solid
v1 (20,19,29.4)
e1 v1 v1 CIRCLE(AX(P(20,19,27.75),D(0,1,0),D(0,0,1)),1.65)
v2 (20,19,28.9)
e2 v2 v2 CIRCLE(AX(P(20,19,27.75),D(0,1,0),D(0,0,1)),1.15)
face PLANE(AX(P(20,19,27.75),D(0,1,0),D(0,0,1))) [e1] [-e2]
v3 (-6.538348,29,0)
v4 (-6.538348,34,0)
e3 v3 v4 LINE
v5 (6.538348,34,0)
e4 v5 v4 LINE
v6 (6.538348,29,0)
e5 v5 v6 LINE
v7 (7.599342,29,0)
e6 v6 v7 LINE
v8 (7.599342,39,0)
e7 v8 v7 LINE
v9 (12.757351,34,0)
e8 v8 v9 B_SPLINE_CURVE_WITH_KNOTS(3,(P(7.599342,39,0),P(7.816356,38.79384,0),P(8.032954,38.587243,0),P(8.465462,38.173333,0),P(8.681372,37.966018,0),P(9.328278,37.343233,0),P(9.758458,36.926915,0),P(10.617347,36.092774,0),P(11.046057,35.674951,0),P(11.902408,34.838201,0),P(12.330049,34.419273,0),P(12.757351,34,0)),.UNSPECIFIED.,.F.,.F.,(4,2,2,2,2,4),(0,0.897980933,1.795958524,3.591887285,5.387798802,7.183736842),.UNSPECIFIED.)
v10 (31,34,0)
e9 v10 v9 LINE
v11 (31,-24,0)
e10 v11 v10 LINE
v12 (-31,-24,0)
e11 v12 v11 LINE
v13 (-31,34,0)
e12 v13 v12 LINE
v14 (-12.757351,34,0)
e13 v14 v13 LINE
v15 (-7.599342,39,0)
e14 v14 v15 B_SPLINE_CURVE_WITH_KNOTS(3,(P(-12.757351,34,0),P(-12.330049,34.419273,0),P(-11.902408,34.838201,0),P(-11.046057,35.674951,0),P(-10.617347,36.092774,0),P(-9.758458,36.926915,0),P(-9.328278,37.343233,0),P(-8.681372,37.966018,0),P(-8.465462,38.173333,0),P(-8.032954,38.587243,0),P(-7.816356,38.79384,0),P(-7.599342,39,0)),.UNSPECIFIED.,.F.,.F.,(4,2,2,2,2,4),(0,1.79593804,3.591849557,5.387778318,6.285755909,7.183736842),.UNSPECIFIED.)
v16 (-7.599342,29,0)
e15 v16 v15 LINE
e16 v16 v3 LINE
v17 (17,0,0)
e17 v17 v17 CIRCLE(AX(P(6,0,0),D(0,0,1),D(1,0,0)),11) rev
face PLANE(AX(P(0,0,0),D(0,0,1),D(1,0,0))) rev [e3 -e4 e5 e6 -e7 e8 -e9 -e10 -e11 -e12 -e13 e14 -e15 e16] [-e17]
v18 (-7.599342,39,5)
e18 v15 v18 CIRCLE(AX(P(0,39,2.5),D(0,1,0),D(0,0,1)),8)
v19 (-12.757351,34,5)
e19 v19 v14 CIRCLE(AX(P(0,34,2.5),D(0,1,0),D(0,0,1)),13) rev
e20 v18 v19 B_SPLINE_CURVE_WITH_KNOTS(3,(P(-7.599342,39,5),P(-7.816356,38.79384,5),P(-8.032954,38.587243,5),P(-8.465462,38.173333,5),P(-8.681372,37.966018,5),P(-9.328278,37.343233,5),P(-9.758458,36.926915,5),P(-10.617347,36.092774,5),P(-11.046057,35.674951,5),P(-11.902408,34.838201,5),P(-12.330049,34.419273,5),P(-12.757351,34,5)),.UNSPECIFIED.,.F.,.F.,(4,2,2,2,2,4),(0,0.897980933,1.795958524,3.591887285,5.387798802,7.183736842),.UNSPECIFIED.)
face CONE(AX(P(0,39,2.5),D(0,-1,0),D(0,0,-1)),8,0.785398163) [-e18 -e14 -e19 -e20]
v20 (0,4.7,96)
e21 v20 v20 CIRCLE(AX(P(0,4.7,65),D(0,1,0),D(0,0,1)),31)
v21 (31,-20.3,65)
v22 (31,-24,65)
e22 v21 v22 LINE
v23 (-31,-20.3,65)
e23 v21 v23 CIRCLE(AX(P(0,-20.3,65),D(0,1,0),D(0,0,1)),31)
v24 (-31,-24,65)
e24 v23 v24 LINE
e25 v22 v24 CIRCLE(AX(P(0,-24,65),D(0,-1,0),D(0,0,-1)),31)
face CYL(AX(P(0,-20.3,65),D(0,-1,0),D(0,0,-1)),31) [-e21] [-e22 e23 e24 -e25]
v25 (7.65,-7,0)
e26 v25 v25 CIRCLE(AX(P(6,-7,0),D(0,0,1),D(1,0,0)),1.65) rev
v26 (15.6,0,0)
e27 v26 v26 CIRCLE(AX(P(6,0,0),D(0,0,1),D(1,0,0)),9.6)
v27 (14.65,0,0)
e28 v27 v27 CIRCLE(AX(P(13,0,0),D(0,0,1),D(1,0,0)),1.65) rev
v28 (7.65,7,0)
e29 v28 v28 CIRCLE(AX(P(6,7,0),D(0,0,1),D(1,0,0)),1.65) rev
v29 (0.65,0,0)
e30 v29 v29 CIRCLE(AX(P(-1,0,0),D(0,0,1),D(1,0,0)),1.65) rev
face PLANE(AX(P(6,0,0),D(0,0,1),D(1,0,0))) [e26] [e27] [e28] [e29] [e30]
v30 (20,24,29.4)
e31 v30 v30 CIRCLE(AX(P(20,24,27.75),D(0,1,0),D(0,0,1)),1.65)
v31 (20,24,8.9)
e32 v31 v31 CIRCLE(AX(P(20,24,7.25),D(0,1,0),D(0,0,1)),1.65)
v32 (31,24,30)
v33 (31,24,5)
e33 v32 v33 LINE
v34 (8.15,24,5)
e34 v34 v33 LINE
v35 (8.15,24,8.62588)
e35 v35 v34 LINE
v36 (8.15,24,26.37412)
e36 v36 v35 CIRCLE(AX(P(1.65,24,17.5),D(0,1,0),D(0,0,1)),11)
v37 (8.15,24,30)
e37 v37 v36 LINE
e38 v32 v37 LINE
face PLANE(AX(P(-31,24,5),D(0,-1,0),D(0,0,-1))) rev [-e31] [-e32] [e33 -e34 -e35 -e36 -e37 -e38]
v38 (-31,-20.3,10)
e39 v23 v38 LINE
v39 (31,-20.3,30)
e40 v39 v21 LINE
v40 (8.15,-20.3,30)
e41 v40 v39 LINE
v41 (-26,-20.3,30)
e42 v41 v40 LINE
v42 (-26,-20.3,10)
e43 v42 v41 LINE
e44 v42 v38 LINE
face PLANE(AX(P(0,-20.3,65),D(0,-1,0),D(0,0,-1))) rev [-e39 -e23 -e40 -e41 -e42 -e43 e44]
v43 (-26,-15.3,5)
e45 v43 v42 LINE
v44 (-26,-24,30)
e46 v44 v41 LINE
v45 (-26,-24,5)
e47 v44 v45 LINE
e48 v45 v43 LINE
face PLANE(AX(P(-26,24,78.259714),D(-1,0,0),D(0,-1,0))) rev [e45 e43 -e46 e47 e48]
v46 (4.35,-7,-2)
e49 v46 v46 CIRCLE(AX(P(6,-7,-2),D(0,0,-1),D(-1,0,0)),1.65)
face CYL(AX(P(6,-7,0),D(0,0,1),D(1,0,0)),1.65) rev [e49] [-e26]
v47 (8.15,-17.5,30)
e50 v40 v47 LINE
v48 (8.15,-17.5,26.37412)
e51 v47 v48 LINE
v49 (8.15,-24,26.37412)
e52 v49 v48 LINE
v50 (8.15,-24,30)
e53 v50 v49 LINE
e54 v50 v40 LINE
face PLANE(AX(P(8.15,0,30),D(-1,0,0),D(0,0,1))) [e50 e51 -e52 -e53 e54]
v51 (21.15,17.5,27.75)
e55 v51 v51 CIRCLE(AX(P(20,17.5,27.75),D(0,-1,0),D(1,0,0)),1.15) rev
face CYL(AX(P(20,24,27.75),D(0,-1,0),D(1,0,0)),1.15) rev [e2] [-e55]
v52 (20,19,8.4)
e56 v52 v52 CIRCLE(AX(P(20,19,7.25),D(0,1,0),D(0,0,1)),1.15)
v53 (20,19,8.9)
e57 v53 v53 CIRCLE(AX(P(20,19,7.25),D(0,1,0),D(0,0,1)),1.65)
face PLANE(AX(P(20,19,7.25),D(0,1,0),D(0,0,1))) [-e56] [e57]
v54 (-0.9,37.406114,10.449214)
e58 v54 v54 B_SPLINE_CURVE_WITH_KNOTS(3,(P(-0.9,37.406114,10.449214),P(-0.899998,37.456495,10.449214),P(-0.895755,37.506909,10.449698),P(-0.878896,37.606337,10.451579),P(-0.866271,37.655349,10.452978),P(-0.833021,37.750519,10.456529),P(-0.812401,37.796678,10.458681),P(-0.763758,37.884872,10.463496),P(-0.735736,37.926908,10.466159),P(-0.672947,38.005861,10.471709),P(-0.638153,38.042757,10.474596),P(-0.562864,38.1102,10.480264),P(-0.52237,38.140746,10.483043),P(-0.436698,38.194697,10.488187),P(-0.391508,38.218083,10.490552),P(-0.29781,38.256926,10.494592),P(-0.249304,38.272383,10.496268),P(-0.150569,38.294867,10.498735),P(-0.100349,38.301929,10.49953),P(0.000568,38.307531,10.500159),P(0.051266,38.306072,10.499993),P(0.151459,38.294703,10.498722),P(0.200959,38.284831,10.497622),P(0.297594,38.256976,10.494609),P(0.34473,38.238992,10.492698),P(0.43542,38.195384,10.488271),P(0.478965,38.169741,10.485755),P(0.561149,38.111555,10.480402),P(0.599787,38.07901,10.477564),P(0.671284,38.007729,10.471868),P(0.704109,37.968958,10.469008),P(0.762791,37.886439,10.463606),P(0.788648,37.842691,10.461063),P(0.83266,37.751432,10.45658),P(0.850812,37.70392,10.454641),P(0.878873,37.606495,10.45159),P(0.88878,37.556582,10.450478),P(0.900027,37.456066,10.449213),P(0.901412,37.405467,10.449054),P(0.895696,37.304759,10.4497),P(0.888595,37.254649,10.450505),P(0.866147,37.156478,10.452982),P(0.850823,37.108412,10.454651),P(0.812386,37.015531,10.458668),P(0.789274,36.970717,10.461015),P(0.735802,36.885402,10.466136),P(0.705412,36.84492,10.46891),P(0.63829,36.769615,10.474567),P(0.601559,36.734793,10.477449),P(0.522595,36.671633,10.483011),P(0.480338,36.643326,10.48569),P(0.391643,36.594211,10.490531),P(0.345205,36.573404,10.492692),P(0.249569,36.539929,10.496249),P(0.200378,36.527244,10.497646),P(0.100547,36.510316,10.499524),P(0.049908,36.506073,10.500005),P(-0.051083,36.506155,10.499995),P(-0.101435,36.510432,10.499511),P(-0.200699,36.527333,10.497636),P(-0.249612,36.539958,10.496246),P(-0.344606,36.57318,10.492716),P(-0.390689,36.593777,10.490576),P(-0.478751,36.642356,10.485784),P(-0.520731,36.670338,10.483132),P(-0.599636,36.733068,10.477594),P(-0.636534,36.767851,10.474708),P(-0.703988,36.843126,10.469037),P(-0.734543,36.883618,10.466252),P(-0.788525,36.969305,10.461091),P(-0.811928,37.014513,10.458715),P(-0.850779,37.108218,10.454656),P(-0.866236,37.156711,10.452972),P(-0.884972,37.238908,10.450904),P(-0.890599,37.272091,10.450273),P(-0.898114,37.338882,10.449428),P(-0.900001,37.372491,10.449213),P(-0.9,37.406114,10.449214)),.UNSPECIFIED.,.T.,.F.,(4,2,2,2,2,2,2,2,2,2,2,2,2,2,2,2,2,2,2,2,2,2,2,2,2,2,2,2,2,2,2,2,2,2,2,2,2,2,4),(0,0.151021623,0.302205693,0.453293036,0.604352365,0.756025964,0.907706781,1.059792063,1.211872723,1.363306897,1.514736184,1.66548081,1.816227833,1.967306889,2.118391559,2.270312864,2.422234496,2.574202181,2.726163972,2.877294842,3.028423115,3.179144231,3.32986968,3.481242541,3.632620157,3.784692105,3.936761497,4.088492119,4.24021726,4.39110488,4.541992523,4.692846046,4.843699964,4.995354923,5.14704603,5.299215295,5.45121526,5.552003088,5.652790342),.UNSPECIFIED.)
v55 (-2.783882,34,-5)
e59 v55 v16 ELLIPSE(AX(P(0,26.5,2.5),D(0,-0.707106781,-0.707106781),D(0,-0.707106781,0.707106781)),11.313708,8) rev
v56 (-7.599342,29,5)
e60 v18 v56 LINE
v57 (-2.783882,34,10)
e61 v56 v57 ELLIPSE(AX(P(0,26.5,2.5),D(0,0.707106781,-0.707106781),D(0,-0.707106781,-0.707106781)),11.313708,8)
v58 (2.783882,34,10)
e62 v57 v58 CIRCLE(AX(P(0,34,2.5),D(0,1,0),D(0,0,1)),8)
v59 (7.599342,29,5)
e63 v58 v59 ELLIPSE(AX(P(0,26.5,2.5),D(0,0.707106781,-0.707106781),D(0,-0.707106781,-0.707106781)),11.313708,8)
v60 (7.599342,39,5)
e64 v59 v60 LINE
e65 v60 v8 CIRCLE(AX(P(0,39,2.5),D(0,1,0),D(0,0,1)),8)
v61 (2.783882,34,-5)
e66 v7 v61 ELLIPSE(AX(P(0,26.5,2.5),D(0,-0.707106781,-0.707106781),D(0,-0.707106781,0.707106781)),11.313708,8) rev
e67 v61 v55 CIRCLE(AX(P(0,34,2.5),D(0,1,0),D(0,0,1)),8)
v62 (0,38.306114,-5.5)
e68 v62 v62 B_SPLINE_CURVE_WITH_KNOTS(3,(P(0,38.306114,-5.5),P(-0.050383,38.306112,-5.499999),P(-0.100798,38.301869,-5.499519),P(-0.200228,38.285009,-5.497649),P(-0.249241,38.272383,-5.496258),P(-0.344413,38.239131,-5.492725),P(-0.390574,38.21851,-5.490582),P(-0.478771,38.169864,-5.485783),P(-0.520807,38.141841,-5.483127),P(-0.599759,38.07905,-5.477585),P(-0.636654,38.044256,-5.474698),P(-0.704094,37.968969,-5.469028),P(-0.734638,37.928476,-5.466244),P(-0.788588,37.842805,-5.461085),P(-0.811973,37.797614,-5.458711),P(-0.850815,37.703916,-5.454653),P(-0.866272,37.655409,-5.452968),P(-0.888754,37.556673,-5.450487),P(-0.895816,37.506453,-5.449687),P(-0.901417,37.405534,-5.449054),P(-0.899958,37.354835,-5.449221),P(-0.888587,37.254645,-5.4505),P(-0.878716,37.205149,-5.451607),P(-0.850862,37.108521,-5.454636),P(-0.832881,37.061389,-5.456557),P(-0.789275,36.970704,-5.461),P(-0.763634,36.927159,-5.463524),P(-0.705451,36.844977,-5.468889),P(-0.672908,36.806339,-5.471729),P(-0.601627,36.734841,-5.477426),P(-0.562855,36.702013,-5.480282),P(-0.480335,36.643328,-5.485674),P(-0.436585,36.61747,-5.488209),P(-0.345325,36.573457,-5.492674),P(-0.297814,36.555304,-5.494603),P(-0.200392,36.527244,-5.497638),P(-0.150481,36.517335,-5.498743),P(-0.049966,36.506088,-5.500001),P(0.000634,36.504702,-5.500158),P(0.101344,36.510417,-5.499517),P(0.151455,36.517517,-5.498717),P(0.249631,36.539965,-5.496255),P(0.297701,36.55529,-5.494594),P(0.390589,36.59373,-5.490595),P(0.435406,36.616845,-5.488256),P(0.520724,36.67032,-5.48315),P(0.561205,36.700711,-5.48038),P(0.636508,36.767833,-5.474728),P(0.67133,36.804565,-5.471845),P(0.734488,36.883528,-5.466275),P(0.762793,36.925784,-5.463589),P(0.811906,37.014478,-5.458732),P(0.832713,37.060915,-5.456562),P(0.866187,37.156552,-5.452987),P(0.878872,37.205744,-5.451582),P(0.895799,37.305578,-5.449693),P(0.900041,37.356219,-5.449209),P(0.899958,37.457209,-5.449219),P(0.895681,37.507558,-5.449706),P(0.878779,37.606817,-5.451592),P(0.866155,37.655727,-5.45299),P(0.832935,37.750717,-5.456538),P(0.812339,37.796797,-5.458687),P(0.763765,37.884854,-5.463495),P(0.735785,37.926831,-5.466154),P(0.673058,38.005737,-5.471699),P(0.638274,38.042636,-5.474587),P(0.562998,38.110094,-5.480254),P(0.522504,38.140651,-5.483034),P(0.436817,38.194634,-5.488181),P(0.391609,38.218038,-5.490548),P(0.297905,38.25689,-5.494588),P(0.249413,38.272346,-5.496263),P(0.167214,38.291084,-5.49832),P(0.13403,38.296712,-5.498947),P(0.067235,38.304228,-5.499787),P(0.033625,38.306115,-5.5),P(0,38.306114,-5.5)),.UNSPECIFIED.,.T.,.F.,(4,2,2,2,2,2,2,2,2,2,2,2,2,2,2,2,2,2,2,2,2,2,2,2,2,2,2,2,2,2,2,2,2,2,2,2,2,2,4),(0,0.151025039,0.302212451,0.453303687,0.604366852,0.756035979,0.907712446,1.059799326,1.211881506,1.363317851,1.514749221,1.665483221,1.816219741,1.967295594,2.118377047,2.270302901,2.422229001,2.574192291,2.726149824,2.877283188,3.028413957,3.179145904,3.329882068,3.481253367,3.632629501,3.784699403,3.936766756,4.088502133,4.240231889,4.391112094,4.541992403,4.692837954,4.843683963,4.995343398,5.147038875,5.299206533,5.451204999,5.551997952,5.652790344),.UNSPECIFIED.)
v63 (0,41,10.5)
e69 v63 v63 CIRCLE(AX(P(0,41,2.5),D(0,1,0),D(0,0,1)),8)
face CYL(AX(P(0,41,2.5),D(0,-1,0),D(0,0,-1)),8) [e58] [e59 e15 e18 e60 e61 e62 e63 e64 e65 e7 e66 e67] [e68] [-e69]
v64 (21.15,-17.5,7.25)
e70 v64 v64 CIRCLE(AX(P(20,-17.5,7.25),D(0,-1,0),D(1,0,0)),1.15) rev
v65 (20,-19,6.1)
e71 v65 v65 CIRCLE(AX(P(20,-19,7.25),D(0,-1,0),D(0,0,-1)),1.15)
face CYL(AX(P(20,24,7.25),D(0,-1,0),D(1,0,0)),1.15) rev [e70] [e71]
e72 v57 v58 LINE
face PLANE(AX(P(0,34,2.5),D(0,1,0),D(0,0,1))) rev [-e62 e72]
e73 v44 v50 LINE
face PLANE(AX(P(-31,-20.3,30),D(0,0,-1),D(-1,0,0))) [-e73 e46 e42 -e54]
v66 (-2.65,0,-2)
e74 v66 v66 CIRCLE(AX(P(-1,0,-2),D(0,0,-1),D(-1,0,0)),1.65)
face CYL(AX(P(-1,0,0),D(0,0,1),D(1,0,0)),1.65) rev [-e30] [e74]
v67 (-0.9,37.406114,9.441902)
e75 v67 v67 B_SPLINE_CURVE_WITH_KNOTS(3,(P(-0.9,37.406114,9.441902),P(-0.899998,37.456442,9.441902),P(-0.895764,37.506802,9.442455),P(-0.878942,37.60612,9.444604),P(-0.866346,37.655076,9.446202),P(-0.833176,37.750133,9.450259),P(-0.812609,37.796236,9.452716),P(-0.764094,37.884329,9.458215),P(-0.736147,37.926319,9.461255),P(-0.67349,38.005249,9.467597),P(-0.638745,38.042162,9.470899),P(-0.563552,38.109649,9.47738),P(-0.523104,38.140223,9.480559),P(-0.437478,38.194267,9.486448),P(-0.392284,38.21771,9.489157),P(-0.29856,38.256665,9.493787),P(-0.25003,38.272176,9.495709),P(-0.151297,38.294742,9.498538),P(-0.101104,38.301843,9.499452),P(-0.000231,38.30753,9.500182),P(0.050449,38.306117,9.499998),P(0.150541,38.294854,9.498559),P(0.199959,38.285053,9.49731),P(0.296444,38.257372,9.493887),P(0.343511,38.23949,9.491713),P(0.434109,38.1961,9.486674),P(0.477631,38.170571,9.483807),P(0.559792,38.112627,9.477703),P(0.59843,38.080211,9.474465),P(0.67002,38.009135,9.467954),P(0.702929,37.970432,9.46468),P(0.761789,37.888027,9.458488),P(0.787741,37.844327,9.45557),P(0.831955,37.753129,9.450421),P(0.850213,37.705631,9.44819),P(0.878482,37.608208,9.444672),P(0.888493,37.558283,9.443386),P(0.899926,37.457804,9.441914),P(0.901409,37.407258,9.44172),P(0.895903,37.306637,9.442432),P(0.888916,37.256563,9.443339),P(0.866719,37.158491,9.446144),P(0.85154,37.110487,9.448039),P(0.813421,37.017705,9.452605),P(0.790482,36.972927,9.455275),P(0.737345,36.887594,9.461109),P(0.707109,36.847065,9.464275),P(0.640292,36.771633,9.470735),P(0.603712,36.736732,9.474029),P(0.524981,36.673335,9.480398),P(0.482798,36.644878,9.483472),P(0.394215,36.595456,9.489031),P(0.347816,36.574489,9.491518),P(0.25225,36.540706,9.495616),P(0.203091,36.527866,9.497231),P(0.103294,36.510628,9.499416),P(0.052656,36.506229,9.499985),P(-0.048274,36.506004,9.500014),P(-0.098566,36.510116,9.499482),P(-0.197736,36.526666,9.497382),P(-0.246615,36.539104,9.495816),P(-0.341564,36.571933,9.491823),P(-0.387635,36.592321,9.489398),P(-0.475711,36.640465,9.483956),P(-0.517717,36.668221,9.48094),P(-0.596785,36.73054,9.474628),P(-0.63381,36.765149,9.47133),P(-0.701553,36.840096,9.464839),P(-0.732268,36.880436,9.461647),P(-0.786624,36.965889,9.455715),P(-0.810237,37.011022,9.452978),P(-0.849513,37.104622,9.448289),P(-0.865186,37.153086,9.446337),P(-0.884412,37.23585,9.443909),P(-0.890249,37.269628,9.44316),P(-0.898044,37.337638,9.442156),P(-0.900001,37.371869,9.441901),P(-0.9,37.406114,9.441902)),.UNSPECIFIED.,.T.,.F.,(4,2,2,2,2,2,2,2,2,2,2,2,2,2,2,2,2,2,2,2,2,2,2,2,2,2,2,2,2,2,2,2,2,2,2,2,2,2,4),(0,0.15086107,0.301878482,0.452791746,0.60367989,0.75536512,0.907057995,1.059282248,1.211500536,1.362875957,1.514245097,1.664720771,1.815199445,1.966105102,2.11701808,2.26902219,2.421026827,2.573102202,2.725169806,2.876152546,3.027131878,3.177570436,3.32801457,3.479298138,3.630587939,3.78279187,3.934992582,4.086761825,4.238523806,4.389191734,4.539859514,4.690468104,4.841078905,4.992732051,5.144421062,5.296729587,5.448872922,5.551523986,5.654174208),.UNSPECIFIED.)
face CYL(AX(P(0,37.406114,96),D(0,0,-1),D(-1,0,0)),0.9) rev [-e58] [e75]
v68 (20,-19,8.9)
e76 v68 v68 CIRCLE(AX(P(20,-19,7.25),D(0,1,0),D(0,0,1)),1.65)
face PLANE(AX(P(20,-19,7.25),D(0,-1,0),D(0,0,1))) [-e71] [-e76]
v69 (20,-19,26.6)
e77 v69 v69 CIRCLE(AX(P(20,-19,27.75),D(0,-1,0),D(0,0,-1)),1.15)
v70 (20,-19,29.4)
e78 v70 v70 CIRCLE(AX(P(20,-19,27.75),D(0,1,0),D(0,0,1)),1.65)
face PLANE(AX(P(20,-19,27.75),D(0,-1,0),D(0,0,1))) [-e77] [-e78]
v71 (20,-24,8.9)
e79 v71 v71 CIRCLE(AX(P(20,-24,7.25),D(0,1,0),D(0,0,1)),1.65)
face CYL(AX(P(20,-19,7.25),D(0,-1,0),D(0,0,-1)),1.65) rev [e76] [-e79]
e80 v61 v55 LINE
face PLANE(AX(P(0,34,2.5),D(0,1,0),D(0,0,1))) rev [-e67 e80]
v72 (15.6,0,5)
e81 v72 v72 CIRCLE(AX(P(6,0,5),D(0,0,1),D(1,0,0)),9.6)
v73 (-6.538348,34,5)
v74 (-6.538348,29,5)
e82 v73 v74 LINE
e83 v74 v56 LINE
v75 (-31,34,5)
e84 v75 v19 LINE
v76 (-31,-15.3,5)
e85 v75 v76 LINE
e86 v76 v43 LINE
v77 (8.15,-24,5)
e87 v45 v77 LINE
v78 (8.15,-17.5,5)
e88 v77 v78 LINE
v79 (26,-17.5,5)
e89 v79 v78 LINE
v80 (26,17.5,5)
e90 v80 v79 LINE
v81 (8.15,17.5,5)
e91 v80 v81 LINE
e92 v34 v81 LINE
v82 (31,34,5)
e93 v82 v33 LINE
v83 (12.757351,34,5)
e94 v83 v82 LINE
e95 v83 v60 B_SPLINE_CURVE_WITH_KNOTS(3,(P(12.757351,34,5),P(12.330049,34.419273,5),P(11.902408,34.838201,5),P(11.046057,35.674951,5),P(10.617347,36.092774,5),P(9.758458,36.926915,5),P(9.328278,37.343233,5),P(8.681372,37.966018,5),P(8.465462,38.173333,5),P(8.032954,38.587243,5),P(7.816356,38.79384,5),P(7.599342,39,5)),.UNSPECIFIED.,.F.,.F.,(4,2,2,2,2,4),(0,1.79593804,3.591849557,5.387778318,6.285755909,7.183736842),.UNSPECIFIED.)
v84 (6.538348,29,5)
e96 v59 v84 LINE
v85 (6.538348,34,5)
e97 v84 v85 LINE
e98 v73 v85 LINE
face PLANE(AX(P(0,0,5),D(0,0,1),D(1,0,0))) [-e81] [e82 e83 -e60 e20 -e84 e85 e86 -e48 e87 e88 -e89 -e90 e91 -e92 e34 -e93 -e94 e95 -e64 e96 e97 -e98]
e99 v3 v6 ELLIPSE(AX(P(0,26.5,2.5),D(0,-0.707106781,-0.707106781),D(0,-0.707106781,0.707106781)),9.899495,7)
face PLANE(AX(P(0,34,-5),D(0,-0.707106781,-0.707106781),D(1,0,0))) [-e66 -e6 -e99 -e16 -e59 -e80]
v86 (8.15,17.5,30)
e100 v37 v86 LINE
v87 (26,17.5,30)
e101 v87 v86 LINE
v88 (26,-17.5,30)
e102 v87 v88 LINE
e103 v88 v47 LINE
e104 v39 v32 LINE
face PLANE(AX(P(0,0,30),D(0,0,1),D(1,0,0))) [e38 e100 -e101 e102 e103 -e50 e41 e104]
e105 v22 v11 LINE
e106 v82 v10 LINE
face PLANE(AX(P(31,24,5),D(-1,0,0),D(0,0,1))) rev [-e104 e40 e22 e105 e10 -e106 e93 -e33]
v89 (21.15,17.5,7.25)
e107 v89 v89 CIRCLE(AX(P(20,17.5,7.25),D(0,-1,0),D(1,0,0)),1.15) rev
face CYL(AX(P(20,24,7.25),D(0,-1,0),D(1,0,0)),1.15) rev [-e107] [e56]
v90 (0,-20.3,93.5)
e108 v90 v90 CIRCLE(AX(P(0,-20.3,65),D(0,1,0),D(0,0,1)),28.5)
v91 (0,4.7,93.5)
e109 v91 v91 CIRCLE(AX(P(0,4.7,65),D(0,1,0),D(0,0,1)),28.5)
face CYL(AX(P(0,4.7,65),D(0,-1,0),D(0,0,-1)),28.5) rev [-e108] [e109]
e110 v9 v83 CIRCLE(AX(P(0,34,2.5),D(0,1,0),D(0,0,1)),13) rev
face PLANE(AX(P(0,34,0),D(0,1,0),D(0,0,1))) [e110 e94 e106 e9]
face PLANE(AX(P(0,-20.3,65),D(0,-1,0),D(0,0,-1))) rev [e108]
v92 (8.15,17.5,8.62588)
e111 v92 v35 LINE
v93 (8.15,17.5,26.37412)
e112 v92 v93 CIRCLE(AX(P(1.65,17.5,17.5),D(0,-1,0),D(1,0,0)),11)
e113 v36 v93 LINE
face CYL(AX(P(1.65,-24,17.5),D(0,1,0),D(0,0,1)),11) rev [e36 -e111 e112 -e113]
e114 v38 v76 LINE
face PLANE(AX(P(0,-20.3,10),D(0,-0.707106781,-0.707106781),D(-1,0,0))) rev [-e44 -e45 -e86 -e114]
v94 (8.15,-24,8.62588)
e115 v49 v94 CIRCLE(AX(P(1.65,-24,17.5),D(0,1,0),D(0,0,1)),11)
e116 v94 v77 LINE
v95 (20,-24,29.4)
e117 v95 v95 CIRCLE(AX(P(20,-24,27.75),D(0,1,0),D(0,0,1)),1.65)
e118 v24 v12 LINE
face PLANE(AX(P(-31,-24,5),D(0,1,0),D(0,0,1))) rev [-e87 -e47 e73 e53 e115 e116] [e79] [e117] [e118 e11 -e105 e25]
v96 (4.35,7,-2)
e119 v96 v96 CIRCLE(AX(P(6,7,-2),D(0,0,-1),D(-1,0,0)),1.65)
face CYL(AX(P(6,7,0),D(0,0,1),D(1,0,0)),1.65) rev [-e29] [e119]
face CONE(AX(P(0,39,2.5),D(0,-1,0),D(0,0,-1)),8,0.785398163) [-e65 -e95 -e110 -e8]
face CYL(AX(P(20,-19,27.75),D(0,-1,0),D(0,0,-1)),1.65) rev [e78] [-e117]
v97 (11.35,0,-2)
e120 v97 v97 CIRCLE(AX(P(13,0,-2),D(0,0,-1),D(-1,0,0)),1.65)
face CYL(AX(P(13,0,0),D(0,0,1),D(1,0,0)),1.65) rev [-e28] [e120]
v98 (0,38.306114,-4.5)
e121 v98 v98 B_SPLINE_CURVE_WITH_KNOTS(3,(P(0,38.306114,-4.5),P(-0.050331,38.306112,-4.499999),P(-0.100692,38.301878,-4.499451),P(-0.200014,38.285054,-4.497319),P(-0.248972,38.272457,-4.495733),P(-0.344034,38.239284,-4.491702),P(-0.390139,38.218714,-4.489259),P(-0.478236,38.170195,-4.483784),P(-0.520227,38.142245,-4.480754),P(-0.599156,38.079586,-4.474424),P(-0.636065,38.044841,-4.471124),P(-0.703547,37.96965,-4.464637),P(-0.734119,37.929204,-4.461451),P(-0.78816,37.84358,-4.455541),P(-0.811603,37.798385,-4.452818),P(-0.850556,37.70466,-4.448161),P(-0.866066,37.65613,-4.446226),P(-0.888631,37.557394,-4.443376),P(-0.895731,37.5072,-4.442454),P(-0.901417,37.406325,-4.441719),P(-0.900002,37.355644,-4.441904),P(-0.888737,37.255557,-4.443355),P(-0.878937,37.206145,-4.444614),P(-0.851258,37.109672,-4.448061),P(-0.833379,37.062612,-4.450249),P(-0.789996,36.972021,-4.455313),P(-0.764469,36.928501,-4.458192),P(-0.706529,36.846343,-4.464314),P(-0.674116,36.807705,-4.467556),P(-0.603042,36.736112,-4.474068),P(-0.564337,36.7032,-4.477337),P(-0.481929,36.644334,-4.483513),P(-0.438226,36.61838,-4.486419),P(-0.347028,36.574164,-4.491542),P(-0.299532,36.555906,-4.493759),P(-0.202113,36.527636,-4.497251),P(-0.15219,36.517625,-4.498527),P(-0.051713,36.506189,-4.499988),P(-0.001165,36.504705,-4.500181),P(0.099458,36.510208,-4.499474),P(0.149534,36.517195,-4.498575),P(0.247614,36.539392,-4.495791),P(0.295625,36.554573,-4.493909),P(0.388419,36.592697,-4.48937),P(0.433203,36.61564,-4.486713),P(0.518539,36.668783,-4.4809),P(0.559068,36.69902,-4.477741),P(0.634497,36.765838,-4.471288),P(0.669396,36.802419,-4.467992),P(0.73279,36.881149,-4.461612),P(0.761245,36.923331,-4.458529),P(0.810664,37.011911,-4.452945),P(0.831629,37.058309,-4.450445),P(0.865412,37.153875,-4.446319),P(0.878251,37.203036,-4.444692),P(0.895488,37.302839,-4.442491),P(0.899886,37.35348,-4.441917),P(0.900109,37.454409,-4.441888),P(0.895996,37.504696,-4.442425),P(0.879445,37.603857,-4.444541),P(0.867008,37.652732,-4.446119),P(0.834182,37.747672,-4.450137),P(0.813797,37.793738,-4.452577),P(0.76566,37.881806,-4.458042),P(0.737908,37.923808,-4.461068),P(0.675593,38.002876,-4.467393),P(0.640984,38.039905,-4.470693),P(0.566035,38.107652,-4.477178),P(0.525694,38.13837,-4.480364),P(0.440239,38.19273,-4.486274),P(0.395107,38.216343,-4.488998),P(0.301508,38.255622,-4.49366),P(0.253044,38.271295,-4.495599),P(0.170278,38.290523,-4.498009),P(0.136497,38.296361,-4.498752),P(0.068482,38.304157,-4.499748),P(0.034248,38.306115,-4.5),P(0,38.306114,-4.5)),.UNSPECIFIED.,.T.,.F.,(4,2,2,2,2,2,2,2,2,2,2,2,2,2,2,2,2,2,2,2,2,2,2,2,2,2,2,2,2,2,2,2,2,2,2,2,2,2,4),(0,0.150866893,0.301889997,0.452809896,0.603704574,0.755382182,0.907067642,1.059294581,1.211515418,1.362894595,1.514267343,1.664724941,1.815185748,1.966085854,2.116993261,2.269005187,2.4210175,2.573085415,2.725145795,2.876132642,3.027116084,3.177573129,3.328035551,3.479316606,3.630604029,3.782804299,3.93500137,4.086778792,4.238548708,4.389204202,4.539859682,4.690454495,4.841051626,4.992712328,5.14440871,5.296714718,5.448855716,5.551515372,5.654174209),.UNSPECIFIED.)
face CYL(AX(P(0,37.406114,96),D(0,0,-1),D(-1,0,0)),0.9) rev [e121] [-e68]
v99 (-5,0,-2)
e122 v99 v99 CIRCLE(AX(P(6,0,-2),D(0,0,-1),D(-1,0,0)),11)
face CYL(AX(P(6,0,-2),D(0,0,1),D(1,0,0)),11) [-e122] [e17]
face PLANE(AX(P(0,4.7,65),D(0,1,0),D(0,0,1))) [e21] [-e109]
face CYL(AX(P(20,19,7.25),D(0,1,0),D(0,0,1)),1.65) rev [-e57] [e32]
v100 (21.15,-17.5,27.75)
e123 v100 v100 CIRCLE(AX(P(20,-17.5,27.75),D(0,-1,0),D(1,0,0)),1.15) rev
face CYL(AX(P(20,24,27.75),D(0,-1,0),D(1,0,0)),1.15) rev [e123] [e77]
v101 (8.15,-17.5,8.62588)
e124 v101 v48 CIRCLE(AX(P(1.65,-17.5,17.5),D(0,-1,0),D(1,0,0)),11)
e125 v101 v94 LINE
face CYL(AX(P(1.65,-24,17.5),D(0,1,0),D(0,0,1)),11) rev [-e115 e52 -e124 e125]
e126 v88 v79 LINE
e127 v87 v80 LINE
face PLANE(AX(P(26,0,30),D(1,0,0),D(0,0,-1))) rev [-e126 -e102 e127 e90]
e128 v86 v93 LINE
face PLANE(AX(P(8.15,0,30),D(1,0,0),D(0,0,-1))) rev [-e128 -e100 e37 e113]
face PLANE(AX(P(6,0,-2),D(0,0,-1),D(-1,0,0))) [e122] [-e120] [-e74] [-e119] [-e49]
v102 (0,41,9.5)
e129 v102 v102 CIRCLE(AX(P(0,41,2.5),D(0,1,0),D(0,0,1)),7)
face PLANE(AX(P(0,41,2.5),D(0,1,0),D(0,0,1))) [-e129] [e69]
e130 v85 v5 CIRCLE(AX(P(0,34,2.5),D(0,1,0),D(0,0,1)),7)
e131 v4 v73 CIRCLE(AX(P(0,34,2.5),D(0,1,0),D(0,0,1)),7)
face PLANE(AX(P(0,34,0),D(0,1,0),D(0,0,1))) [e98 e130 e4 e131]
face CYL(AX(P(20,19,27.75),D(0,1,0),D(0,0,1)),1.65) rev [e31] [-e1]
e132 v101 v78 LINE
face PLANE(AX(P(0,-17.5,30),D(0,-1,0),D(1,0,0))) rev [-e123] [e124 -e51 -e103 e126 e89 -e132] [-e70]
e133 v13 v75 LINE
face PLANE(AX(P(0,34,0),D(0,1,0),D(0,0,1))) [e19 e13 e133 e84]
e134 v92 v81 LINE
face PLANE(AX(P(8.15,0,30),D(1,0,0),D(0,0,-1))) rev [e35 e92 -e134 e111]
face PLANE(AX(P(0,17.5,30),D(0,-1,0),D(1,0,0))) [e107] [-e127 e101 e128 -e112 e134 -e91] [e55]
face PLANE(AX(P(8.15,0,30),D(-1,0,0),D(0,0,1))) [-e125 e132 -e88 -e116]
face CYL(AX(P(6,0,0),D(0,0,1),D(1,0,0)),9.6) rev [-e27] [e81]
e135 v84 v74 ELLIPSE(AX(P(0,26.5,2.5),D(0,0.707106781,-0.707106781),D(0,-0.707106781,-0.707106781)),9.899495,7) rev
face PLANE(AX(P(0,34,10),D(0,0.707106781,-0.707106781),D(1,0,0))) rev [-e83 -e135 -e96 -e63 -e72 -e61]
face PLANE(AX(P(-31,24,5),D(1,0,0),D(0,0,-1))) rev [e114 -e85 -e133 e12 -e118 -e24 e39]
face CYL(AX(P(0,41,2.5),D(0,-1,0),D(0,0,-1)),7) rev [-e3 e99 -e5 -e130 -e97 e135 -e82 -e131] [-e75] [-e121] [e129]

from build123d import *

# Parameters (mm, degrees)
SKETCH1_W               = 62
SKETCH1_H               = 48
BOSS_EXTRUDE1_DEPTH     = 5
SKETCH2_R               = 1.65
CUT_EXTRUDE2_DEPTH      = 5
SKETCH3_R               = 11
SKETCH3_R_2             = 1.65
BOSS_EXTRUDE2_DEPTH     = 2
SKETCH4_R               = 9.6
CUT_EXTRUDE4_DEPTH      = 5
SKETCH5_W               = 5
SKETCH5_H               = 35
BOSS_EXTRUDE3_DEPTH     = 25
CUT_EXTRUDE5_DEPTH      = 60.860253925
CUT_EXTRUDE5_DEPTH_BACK = 25
SKETCH6_R               = 1.15
SKETCH7_R               = 1.65
CUT_EXTRUDE6_DEPTH      = 5
SKETCH8_R               = 11
CUT_EXTRUDE7_DEPTH      = 65.536811201
SKETCH9_W               = 19
SKETCH9_H               = 60
BOSS_EXTRUDE4_DEPTH     = 3
SKETCH10_W              = 19
SKETCH10_H              = 55
BOSS_EXTRUDE5_DEPTH     = 3.7
SKETCH11_W              = 5
SKETCH11_H              = 48
BOSS_EXTRUDE6_DEPTH     = 25
BOSS_EXTRUDE7_DEPTH     = 3.7
SKETCH13_R              = 31
SKETCH13_R_2            = 28.5
BOSS_EXTRUDE8_DEPTH     = 25
SKETCH14_W              = 62
SKETCH14_H              = 5
BOSS_EXTRUDE9_DEPTH     = 10
SKETCH15_R              = 8
SKETCH15_R_2            = 7
BOSS_EXTRUDE10_DEPTH    = 7
CHAMFER1_SIZE           = 5
CUT_EXTRUDE8_DEPTH      = 109.894444303
CUT_EXTRUDE8_DEPTH_BACK = 109.894444303
SKETCH16_R              = 0.9
CHAMFER2_SIZE           = 5
SKETCH17_W              = 19
SKETCH17_H              = 60
CUT_EXTRUDE9_DEPTH      = 10
SKETCH18_W              = 30
SKETCH18_H              = 44.3
CUT_EXTRUDE10_DEPTH     = 10
CHAMFER3_SIZE           = 5


with BuildPart() as part:
    # Sketch1 → Boss-Extrude1 (new body)
    with BuildSketch(Plane.XY):
        Rectangle(SKETCH1_W, SKETCH1_H)
    extrude(amount=BOSS_EXTRUDE1_DEPTH)

    # Sketch2 → Cut-Extrude2 (cut)
    with BuildSketch(Plane.XY.offset(5)):
        with Locations((6, 7)):
            Circle(SKETCH2_R)
        with Locations((13, 0)):
            Circle(SKETCH2_R)
        with Locations((6, -7)):
            Circle(SKETCH2_R)
        with Locations((-1, 0)):
            Circle(SKETCH2_R)
    extrude(amount=-CUT_EXTRUDE2_DEPTH, mode=Mode.SUBTRACT)

    # Sketch3 → Boss-Extrude2 (add)
    with BuildSketch(Plane(origin=(0, 0, 0), x_dir=(-1, 0, 0), z_dir=(0, 0, -1))):
        with Locations(Location((-6, 0, 0), (0, 0, 180))):
            Circle(SKETCH3_R)
        with Locations(Location((1, 0, 0), (0, 0, 180))):
            Circle(SKETCH3_R_2, mode=Mode.SUBTRACT)
        with Locations(Location((-6, -7, 0), (0, 0, 180))):
            Circle(SKETCH3_R_2, mode=Mode.SUBTRACT)
        with Locations(Location((-13, 0, 0), (0, 0, 180))):
            Circle(SKETCH3_R_2, mode=Mode.SUBTRACT)
        with Locations(Location((-6, 7, 0), (0, 0, 180))):
            Circle(SKETCH3_R_2, mode=Mode.SUBTRACT)
    extrude(amount=BOSS_EXTRUDE2_DEPTH)

    # Sketch4 → Cut-Extrude4 (cut)
    with BuildSketch(Plane.XY.offset(5)):
        with Locations((6, 0)):
            Circle(SKETCH4_R)
    extrude(amount=-CUT_EXTRUDE4_DEPTH, mode=Mode.SUBTRACT)

    # Sketch5 → Boss-Extrude3 (add)
    with BuildSketch(Plane.XY.offset(5)):
        Polygon((8.15, -17.5), (8.15, -24), (31, -24), (31, -17.5), (26, -17.5), align=None)
        with Locations((28.5, 0)):
            Rectangle(SKETCH5_W, SKETCH5_H)
        Polygon((8.15, 17.5), (26, 17.5), (31, 17.5), (31, 24), (8.15, 24), align=None)
    extrude(amount=BOSS_EXTRUDE3_DEPTH)

    # Sketch6 → Cut-Extrude5 (cut, two sides: drawn at the far end of the back side and taken through both)
    with BuildSketch(Plane(origin=(0, -17.5, 0), x_dir=(1, 0, 0), z_dir=(0, 1, 0)).offset(-CUT_EXTRUDE5_DEPTH_BACK)):
        with Locations((20, -27.75)):
            Circle(SKETCH6_R)
        with Locations((20, -7.25)):
            Circle(SKETCH6_R)
        with Locations((-0.7, -7.25)):
            Circle(SKETCH6_R)
        with Locations((-0.7, -27.75)):
            Circle(SKETCH6_R)
    extrude(amount=CUT_EXTRUDE5_DEPTH + CUT_EXTRUDE5_DEPTH_BACK, mode=Mode.SUBTRACT)

    # Sketch7 → Cut-Extrude6 (cut)
    with BuildSketch(Plane(origin=(0, 24, 0), x_dir=(1, 0, 0), z_dir=(0, 1, 0))):
        with Locations((0.45, -7.25)):
            Circle(SKETCH7_R)
        with Locations(Location((20, -7.25, 0), (0, 0, 270))):
            Circle(SKETCH7_R)
        with Locations(Location((20, -27.75, 0), (0, 0, 270))):
            Circle(SKETCH7_R)
        with Locations((0.45, -27.75)):
            Circle(SKETCH7_R)
    cut_extrude6 = extrude(amount=-CUT_EXTRUDE6_DEPTH, mode=Mode.SUBTRACT)

    # Mirror1: Cut-Extrude6 across plane
    add(cut_extrude6.mirror(Plane.ZX), mode=Mode.SUBTRACT)

    # Sketch8 → Cut-Extrude7 (cut, through all)
    with BuildSketch(Plane(origin=(0, 24, 0), x_dir=(1, 0, 0), z_dir=(0, 1, 0))):
        with Locations((1.65, -17.5)):
            Circle(SKETCH8_R)
    extrude(amount=-CUT_EXTRUDE7_DEPTH, mode=Mode.SUBTRACT)

    # Sketch9 → Boss-Extrude4 (add)
    with BuildSketch(Plane(origin=(0, 24, 0), x_dir=(1, 0, 0), z_dir=(0, 1, 0))):
        with Locations((17.65, -60)):
            Rectangle(SKETCH9_W, SKETCH9_H)
    extrude(amount=-BOSS_EXTRUDE4_DEPTH)

    # Sketch10 → Boss-Extrude5 (add)
    with BuildSketch(Plane(origin=(0, 24, 0), x_dir=(1, 0, 0), z_dir=(0, 1, 0))):
        with Locations((17.65, -62.5)):
            Rectangle(SKETCH10_W, SKETCH10_H)
    extrude(amount=BOSS_EXTRUDE5_DEPTH)

    # Sketch11 → Boss-Extrude6 (add)
    with BuildSketch(Plane.XY.offset(5)):
        with Locations((-28.5, 0)):
            Rectangle(SKETCH11_W, SKETCH11_H)
    extrude(amount=BOSS_EXTRUDE6_DEPTH)

    # Sketch12 → Boss-Extrude7 (add)
    with BuildSketch(Plane.XZ.offset(24)):
        with BuildLine():
            Line((-31, 30), (31, 30))
            Line((31, 30), (31, 65))
            ThreePointArc((31, 65), (0, 96), (-31, 65))
            Line((-31, 65), (-31, 30))
        make_face()
    extrude(amount=-BOSS_EXTRUDE7_DEPTH)

    # Sketch13 → Boss-Extrude8 (add)
    with BuildSketch(Plane(origin=(0, -20.3, 0), x_dir=(1, 0, 0), z_dir=(0, 1, 0))):
        with Locations((0, -65)):
            Circle(SKETCH13_R)
        with Locations(Location((0, -65, 0), (0, 0, 270))):
            Circle(SKETCH13_R_2, mode=Mode.SUBTRACT)
    extrude(amount=BOSS_EXTRUDE8_DEPTH)

    # Sketch14 → Boss-Extrude9 (add)
    with BuildSketch(Plane(origin=(0, 24, 0), x_dir=(1, 0, 0), z_dir=(0, 1, 0))):
        with Locations((0, -2.5)):
            Rectangle(SKETCH14_W, SKETCH14_H)
    extrude(amount=BOSS_EXTRUDE9_DEPTH)

    # Sketch15 → Boss-Extrude10 (add)
    with BuildSketch(Plane(origin=(0, 34, 0), x_dir=(1, 0, 0), z_dir=(0, 1, 0))):
        with Locations(Location((0, -2.5, 0), (0, 0, 18.209956864))):
            Circle(SKETCH15_R)
        with Locations(Location((0, -2.5, 0), (0, 0, 159.075167572))):
            Circle(SKETCH15_R_2, mode=Mode.SUBTRACT)
    extrude(amount=BOSS_EXTRUDE10_DEPTH)

    # Chamfer1
    # the kernel refuses this chamfer: 5 mm, written as the material it adds along each edge
    with BuildSketch(Plane(origin=(0, 34, 2.5), x_dir=(0.34706049300703296, 0, -0.9378427449171398), z_dir=(0.9378427449171398, 0, 0.34706049300703296))) as chamfer1_piece_1_section:
        Polygon((8 + CHAMFER1_SIZE, 0), (8, CHAMFER1_SIZE), (8, 0), align=None)
    chamfer1_piece_1 = revolve(axis=Axis((0, 34, 2.5), (0, 1, 0)), revolution_arc=220.61525354, mode=Mode.PRIVATE)
    chamfer1_piece_1 = split(chamfer1_piece_1, bisect_by=Plane(origin=(-9.551791351, 35.668281916, 5), z_dir=(0, 0, -1)), keep=Keep.TOP, mode=Mode.PRIVATE)
    chamfer1_piece_1 = split(chamfer1_piece_1, bisect_by=Plane(origin=(-9.551791351, 35.668281916, 0), z_dir=(0, 0, 1)), keep=Keep.TOP, mode=Mode.PRIVATE)
    add(chamfer1_piece_1)
    with BuildSketch(Plane(origin=(0, 34, 2.5), x_dir=(-0.3470604930069759, 0, 0.9378427449171609), z_dir=(-0.9378427449171609, 0, -0.3470604930069759))) as chamfer1_piece_2_section:
        Polygon((8 + CHAMFER1_SIZE, 0), (8, CHAMFER1_SIZE), (8, 0), align=None)
    chamfer1_piece_2 = revolve(axis=Axis((0, 34, 2.5), (0, 1, 0)), revolution_arc=220.61525354, mode=Mode.PRIVATE)
    chamfer1_piece_2 = split(chamfer1_piece_2, bisect_by=Plane(origin=(9.551791351, 35.668281916, 5), z_dir=(0, 0, -1)), keep=Keep.TOP, mode=Mode.PRIVATE)
    chamfer1_piece_2 = split(chamfer1_piece_2, bisect_by=Plane(origin=(9.551791351, 35.668281916, 0), z_dir=(0, 0, 1)), keep=Keep.TOP, mode=Mode.PRIVATE)
    add(chamfer1_piece_2)

    # Sketch16 → Cut-Extrude8 (cut, two sides: drawn at the far end of the back side and taken through both)
    with BuildSketch(Plane(origin=(0, 0, 0), x_dir=(-1, 0, 0), z_dir=(0, 0, -1)).offset(-CUT_EXTRUDE8_DEPTH_BACK)):
        with Locations((0, 37.406113714)):
            Circle(SKETCH16_R)
    extrude(amount=CUT_EXTRUDE8_DEPTH + CUT_EXTRUDE8_DEPTH_BACK, mode=Mode.SUBTRACT)

    # Chamfer2
    # the kernel refuses this chamfer: 5 mm, written as the material it adds along each edge
    with BuildSketch(Plane(origin=(6.320066525, 34, 5), x_dir=(0, -0.9996219169112968, -0.027495876610586317), z_dir=(-1, 0, 0))) as chamfer2_piece_1_section:
        Polygon((CHAMFER2_SIZE * 0.999621916911, CHAMFER2_SIZE * 0.0274958766106), (-CHAMFER2_SIZE * 0.0274958766106, CHAMFER2_SIZE * 0.999621916911), (0, 0), align=None)
    chamfer2_piece_1 = extrude(amount=26.777823541, mode=Mode.PRIVATE)
    chamfer2_piece_1 = chamfer2_piece_1 & Plane(origin=(0, 31.52085101, 2.5), x_dir=(0.94991775959971, 0, -0.31249999999530786), z_dir=(0, -1, 0)) * Cylinder(8, 74, mode=Mode.PRIVATE)
    chamfer2_piece_1 = chamfer2_piece_1 - Plane(origin=(0, 31.52085101, 2.5), x_dir=(-0.9340497736136041, 0, -0.3571428571487537), z_dir=(0, -1, 0)) * Cylinder(7, 74, mode=Mode.PRIVATE)
    add(chamfer2_piece_1)
    with BuildSketch(Plane(origin=(20.457757017, 34, 5), x_dir=(0, -0.9996219169112968, -0.027495876610586317), z_dir=(-1, 0, 0))) as chamfer2_piece_2_section:
        Polygon((CHAMFER2_SIZE * 0.999621916911, CHAMFER2_SIZE * 0.0274958766106), (-CHAMFER2_SIZE * 0.0274958766106, CHAMFER2_SIZE * 0.999621916911), (0, 0), align=None)
    chamfer2_piece_2 = extrude(amount=26.777823541, mode=Mode.PRIVATE)
    chamfer2_piece_2 = chamfer2_piece_2 & Plane(origin=(0, 31.52085101, 2.5), x_dir=(0.94991775959971, 0, -0.31249999999530786), z_dir=(0, -1, 0)) * Cylinder(8, 74, mode=Mode.PRIVATE)
    chamfer2_piece_2 = chamfer2_piece_2 - Plane(origin=(0, 31.52085101, 2.5), x_dir=(-0.9340497736136041, 0, -0.3571428571487537), z_dir=(0, -1, 0)) * Cylinder(7, 74, mode=Mode.PRIVATE)
    add(chamfer2_piece_2)
    with BuildSketch(Plane(origin=(-6.320066525, 34, 0), x_dir=(0, -0.9996219169112968, 0.027495876610586372), z_dir=(1, 0, 0))) as chamfer2_piece_3_section:
        Polygon((CHAMFER2_SIZE * 0.999621916911, CHAMFER2_SIZE * 0.0274958766106), (-CHAMFER2_SIZE * 0.0274958766106, CHAMFER2_SIZE * 0.999621916911), (0, 0), align=None)
    chamfer2_piece_3 = extrude(amount=26.777823541, mode=Mode.PRIVATE)
    chamfer2_piece_3 = chamfer2_piece_3 & Plane(origin=(0, 31.52085101, 2.5), x_dir=(0.94991775959971, 0, -0.31249999999530786), z_dir=(0, -1, 0)) * Cylinder(8, 74, mode=Mode.PRIVATE)
    chamfer2_piece_3 = chamfer2_piece_3 - Plane(origin=(0, 31.52085101, 2.5), x_dir=(-0.9340497736136041, 0, -0.3571428571487537), z_dir=(0, -1, 0)) * Cylinder(7, 74, mode=Mode.PRIVATE)
    add(chamfer2_piece_3)
    with BuildSketch(Plane(origin=(-20.457757017, 34, 0), x_dir=(0, -0.9996219169112968, 0.027495876610586372), z_dir=(1, 0, 0))) as chamfer2_piece_4_section:
        Polygon((CHAMFER2_SIZE * 0.999621916911, CHAMFER2_SIZE * 0.0274958766106), (-CHAMFER2_SIZE * 0.0274958766106, CHAMFER2_SIZE * 0.999621916911), (0, 0), align=None)
    chamfer2_piece_4 = extrude(amount=26.777823541, mode=Mode.PRIVATE)
    chamfer2_piece_4 = chamfer2_piece_4 & Plane(origin=(0, 31.52085101, 2.5), x_dir=(0.94991775959971, 0, -0.31249999999530786), z_dir=(0, -1, 0)) * Cylinder(8, 74, mode=Mode.PRIVATE)
    chamfer2_piece_4 = chamfer2_piece_4 - Plane(origin=(0, 31.52085101, 2.5), x_dir=(-0.9340497736136041, 0, -0.3571428571487537), z_dir=(0, -1, 0)) * Cylinder(7, 74, mode=Mode.PRIVATE)
    add(chamfer2_piece_4)
    with BuildSketch(Plane(origin=(-31, -20.3, 30), x_dir=(0, -0.027495876610586317, 0.9996219169112968), z_dir=(1, 0, 0))) as chamfer2_piece_5:
        Polygon((CHAMFER2_SIZE * 0.999621916911, -CHAMFER2_SIZE * 0.0274958766106), (-CHAMFER2_SIZE * 0.0274958766106, -CHAMFER2_SIZE * 0.999621916911), (0, 0), align=None)
    extrude(amount=5)

    # Sketch17 → Cut-Extrude9 (cut)
    with BuildSketch(Plane(origin=(0, 27.7, 0), x_dir=(1, 0, 0), z_dir=(0, 1, 0))):
        with Locations((17.65, -60)):
            Rectangle(SKETCH17_W, SKETCH17_H)
    extrude(amount=-CUT_EXTRUDE9_DEPTH, mode=Mode.SUBTRACT)

    # Sketch18 → Cut-Extrude10 (cut)
    with BuildSketch(Plane.ZY.offset(31)):
        with Locations((20, 1.85)):
            Rectangle(SKETCH18_W, SKETCH18_H)
    extrude(amount=-CUT_EXTRUDE10_DEPTH, mode=Mode.SUBTRACT)

    # Chamfer3
    chamfer3_edges = [part.edges().sort_by_distance(p)[0] for p in [
        (-28.5, -20.3, 5),
    ]]
    chamfer(chamfer3_edges, length=CHAMFER3_SIZE)


solid = part.part
